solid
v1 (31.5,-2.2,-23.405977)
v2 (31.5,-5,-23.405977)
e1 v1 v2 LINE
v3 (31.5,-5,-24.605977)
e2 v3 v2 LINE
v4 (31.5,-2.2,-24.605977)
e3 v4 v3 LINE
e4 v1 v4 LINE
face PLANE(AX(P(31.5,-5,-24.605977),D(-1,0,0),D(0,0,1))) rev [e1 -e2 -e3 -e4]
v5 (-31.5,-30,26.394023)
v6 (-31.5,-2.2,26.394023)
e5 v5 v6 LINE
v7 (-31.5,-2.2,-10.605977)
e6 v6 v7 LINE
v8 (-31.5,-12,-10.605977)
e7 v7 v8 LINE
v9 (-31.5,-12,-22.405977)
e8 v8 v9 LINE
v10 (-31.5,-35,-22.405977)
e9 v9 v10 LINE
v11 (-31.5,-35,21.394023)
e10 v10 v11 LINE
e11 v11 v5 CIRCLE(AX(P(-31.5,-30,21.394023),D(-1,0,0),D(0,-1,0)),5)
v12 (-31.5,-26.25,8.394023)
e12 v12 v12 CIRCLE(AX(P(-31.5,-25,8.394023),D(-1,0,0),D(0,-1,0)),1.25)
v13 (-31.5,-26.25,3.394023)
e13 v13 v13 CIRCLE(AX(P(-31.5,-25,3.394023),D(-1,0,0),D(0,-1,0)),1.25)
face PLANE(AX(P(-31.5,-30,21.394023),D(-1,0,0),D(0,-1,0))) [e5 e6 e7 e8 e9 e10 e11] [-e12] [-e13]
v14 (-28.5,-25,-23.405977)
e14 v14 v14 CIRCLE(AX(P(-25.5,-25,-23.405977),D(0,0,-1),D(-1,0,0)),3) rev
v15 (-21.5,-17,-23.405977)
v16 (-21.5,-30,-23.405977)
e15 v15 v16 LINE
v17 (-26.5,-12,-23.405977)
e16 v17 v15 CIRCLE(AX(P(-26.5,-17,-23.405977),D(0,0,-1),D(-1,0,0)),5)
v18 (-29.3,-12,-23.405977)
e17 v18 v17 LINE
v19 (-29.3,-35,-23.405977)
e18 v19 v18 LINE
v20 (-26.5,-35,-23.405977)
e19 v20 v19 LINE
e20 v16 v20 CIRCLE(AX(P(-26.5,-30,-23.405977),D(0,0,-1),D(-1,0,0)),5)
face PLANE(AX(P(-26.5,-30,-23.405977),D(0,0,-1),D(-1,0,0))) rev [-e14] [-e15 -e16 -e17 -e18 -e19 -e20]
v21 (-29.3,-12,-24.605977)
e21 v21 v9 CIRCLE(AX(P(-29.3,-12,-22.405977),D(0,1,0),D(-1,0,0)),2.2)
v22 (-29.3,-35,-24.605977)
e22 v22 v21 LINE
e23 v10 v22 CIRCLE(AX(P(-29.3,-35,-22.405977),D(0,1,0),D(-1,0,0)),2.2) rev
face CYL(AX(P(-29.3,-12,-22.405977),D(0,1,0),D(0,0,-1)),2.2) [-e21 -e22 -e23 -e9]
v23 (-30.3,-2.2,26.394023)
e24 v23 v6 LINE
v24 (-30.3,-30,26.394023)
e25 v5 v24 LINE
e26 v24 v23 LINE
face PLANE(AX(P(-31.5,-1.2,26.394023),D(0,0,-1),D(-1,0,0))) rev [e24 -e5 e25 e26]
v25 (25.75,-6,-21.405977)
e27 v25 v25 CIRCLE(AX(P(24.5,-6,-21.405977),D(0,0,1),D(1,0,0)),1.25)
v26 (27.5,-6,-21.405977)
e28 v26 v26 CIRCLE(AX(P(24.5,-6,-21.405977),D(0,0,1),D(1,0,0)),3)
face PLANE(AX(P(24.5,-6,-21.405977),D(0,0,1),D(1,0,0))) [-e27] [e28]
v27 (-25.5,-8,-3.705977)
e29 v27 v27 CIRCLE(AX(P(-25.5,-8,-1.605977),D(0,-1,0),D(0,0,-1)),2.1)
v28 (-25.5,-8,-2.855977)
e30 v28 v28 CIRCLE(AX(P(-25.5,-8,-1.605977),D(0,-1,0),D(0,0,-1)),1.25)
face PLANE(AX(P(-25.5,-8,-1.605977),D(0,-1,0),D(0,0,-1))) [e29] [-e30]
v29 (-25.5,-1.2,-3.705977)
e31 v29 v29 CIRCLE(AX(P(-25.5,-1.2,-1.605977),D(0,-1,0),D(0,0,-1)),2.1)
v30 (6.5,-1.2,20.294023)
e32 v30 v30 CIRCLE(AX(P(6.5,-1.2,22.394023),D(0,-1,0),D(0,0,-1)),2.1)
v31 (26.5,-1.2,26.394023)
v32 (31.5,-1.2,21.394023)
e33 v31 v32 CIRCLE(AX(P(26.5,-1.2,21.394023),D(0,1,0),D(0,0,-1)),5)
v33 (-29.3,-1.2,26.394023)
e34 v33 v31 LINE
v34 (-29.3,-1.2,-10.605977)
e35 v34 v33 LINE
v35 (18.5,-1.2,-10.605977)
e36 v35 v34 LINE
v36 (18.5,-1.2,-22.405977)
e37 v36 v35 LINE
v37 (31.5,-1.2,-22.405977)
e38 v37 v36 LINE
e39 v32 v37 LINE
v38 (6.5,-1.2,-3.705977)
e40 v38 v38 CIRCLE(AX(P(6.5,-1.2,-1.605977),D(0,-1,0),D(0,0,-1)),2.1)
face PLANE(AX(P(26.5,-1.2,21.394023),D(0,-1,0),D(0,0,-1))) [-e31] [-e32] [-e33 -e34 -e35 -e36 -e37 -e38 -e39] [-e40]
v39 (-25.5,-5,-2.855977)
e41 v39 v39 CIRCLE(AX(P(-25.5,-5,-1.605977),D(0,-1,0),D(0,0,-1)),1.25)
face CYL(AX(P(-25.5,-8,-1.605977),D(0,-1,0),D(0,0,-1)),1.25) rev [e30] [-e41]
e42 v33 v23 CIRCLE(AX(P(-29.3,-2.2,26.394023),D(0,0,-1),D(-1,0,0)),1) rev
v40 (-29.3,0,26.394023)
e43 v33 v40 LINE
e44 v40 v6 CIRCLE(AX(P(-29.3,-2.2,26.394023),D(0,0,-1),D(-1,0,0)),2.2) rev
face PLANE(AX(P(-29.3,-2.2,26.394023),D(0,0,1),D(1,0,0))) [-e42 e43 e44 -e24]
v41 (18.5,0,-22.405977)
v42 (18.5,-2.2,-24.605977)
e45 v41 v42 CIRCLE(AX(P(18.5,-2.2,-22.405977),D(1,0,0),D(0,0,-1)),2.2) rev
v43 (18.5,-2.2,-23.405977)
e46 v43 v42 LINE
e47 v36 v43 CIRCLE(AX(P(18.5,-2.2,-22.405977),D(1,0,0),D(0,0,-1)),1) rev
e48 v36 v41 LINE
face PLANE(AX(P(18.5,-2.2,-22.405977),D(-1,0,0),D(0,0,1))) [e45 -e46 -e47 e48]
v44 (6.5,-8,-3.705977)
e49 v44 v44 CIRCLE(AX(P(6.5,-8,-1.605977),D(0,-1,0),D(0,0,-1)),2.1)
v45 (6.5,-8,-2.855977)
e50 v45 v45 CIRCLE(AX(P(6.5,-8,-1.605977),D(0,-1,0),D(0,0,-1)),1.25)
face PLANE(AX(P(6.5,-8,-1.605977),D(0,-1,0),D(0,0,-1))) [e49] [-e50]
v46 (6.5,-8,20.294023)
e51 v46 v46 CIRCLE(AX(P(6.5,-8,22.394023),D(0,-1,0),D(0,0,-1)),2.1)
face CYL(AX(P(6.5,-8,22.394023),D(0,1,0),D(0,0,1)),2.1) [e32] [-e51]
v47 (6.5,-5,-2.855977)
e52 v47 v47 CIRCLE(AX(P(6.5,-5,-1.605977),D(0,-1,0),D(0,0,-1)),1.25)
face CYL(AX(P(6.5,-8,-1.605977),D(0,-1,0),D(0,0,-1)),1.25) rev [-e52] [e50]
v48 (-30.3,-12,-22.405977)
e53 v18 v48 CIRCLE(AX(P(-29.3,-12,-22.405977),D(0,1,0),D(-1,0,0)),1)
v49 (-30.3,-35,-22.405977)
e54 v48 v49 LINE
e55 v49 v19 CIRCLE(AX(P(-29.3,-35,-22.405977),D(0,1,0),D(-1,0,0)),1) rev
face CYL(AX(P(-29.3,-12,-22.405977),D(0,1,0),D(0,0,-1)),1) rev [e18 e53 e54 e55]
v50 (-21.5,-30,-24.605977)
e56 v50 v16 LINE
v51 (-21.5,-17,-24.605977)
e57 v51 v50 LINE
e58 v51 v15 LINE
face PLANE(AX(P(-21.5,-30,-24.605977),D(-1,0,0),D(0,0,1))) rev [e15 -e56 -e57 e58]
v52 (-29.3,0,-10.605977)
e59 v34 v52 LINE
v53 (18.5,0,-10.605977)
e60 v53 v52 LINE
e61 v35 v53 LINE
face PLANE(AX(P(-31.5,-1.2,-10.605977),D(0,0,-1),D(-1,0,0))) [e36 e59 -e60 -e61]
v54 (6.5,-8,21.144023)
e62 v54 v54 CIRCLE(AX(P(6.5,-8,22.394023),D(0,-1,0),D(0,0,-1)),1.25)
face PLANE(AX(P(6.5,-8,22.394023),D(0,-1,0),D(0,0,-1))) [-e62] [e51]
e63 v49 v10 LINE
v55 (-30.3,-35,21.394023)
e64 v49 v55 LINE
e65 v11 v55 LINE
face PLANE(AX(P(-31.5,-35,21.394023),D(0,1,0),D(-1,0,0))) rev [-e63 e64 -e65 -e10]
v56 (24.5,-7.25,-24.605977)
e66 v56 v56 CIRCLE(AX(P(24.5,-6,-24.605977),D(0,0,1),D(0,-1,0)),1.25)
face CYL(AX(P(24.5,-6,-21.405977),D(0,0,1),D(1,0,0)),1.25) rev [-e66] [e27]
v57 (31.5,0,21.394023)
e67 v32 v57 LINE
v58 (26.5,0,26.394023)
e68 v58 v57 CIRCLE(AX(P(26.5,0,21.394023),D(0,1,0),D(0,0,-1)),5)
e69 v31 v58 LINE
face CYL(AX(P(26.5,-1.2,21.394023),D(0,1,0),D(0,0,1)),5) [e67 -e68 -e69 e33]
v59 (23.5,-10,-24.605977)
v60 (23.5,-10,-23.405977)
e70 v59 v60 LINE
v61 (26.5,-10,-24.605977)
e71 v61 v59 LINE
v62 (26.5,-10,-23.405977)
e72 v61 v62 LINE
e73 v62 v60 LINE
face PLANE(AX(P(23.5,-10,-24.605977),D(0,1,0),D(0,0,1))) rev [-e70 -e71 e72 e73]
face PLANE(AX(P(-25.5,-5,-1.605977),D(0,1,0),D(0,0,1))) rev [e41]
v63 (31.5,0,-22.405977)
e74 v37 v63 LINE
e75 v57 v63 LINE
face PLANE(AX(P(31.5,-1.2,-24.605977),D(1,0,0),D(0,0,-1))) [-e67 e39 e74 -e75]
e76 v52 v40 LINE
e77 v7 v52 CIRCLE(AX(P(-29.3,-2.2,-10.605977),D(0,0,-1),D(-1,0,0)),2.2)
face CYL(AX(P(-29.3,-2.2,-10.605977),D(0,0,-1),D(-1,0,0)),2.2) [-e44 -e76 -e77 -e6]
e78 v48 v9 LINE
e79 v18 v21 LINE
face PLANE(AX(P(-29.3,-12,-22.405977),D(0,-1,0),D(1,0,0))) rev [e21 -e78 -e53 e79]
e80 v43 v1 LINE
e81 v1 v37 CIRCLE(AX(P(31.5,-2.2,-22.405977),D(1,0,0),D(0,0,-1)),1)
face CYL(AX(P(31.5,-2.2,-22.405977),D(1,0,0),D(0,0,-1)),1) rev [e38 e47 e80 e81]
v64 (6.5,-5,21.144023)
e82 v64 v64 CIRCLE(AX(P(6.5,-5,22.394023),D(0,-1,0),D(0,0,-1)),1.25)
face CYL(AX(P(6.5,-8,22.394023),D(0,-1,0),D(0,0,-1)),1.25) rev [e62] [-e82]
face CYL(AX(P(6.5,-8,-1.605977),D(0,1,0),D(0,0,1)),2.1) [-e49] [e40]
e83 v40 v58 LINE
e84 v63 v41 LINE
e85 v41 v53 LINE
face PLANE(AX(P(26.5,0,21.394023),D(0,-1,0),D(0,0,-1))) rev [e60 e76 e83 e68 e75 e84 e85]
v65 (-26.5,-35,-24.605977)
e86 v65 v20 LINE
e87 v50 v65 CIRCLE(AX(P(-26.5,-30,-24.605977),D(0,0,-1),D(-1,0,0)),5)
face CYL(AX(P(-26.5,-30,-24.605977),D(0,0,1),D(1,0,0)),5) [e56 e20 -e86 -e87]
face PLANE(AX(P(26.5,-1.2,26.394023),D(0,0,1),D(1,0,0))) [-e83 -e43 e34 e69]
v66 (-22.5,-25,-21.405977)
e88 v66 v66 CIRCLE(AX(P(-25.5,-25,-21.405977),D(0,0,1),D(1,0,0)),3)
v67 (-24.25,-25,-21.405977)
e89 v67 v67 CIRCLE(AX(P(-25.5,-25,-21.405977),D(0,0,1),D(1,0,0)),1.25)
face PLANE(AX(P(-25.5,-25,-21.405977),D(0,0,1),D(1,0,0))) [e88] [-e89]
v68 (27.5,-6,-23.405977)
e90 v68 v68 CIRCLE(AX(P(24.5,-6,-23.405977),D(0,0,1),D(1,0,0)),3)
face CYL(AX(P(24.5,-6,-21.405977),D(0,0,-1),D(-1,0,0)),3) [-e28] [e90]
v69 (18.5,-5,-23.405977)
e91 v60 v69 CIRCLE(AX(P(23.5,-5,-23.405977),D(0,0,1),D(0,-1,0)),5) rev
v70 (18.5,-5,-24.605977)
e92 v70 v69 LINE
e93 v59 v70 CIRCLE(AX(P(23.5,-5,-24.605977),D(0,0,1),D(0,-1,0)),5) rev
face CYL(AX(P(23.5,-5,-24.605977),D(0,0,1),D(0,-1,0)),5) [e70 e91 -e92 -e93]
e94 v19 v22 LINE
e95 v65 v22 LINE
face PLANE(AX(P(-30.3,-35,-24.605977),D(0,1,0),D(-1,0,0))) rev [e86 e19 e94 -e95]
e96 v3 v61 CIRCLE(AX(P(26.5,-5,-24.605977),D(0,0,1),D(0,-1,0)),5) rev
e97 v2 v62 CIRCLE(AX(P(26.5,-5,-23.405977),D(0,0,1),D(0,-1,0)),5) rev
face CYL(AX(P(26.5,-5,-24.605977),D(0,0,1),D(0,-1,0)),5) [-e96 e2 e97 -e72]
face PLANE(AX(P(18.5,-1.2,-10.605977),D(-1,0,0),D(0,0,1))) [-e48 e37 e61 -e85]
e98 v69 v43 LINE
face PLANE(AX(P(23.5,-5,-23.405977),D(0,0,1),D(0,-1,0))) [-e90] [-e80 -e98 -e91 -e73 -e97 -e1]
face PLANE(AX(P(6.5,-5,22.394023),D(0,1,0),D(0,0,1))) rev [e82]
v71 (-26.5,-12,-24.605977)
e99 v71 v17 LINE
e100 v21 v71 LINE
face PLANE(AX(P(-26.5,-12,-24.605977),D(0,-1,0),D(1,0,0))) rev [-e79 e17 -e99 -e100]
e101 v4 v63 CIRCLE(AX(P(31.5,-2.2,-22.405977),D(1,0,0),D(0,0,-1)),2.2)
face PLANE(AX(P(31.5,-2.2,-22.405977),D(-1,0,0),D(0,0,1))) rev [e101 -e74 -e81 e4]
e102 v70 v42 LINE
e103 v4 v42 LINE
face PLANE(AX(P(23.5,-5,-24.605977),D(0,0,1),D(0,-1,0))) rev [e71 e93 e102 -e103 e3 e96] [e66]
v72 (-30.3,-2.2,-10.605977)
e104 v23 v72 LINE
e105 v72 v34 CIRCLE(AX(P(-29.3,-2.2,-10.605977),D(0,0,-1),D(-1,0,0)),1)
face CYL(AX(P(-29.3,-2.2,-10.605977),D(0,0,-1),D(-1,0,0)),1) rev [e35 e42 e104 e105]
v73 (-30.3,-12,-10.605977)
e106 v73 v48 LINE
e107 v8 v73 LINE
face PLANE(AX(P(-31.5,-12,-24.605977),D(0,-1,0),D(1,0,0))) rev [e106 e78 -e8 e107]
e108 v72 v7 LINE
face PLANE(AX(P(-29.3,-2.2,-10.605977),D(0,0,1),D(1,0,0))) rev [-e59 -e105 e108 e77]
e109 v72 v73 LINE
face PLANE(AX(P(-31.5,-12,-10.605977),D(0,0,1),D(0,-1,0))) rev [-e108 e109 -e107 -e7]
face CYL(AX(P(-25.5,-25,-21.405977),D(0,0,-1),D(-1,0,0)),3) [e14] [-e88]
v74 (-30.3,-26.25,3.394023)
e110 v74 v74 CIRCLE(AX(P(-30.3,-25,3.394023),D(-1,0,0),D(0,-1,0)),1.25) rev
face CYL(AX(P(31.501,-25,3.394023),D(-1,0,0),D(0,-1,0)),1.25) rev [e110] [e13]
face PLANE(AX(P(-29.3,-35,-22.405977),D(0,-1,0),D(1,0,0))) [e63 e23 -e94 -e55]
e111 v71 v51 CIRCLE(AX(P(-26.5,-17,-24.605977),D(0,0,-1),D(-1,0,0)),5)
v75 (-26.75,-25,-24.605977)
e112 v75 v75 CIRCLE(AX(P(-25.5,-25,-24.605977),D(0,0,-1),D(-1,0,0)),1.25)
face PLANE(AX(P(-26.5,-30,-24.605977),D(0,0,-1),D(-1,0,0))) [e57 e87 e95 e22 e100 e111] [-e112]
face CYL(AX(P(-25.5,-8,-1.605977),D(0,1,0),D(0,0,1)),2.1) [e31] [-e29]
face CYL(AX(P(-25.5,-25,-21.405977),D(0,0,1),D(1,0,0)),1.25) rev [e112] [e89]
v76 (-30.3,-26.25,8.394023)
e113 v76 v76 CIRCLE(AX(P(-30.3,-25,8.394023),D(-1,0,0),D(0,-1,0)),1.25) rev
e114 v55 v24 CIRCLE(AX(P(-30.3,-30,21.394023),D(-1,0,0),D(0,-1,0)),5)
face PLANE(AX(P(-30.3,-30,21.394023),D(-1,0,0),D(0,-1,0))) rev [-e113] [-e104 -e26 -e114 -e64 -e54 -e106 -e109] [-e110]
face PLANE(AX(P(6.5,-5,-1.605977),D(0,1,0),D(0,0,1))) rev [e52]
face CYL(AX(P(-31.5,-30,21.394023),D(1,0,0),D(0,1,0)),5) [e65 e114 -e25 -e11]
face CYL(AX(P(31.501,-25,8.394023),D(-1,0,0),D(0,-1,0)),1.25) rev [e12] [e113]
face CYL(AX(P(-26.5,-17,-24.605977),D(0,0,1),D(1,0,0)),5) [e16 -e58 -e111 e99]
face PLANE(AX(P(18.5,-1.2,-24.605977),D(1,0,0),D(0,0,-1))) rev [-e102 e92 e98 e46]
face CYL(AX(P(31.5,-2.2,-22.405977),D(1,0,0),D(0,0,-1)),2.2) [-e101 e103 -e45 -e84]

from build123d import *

# Parameters (mm, degrees)
SM_BASE_FLANGE_1_DEPTH           = 1.2
SKETCH_9_R                       = 2.1
EXTRUDE_1_DEPTH                  = 6.8
HOLE_WIZARD_M3_1_D               = 2.5
HOLE_WIZARD_M3_1_DEPTH           = 3
SM_EDGE_FLANGE_1_STRIP_W         = 6.8
SM_EDGE_FLANGE_1_STRIP_H         = 1.2
SM_EDGE_FLANGE_1_STRIP_CUT_DEPTH = 13
SM_EDGE_FLANGE_1_DEPTH           = 13
SM_EDGE_FLANGE_1_FLAT_DEPTH      = 1.2
SKETCH_15_R                      = 3
EXTRUDE_2_DEPTH                  = 2
HOLE_WIZARD_M3_2_D               = 2.5
SM_EDGE_FLANGE_4_STRIP_W         = 6.8
SM_EDGE_FLANGE_4_STRIP_H         = 1.2
SM_EDGE_FLANGE_4_STRIP_CUT_DEPTH = 37
SM_EDGE_FLANGE_4_DEPTH           = 37
SM_EDGE_FLANGE_4_FLAT_DEPTH      = 1.2
SM_EDGE_FLANGE_5_STRIP_W         = 6.8
SM_EDGE_FLANGE_5_STRIP_H         = 1.2
SM_EDGE_FLANGE_5_STRIP_CUT_DEPTH = 23
SM_EDGE_FLANGE_5_DEPTH           = 23
SM_EDGE_FLANGE_5_FLAT_DEPTH      = 1.2
SKETCH_26_R                      = 3
EXTRUDE_3_DEPTH                  = 2
HOLE_WIZARD_M3_3_D               = 2.5
CUT_EXTRUDE_1_REACH              = 78.751
SKETCH_29_R                      = 1.25


# Sheet-metal steps are written as plain solids
with BuildPart() as part:
    # Sketch 1 → 基体-法兰1 (new body)
    with BuildSketch(Plane(origin=(0, 0, 0), x_dir=(1, 0, 0), z_dir=(0, 1, 0))):
        with BuildLine():
            Line((18.5, 24.605976874), (31.5, 24.605976874))
            Line((31.5, 24.605976874), (31.5, -21.394023126))
            ThreePointArc((31.5, -21.394023126), (30.035533906, -24.929557032), (26.5, -26.394023126))
            Line((26.5, -26.394023126), (-31.5, -26.394023126))
            Line((-31.5, -26.394023126), (-31.5, 10.605976874))
            Line((-31.5, 10.605976874), (18.5, 10.605976874))
            Line((18.5, 10.605976874), (18.5, 24.605976874))
        make_face()
    extrude(amount=-SM_BASE_FLANGE_1_DEPTH)

    # 草图9 → 凸台-拉伸1 (add)
    with BuildSketch(Plane.XZ.offset(1.2)):
        with Locations(Location((-25.5, -1.605976874, 0), (0, 0, 270))):
            Circle(SKETCH_9_R)
        with Locations(Location((6.5, 22.394023126, 0), (0, 0, 270))):
            Circle(SKETCH_9_R)
        with Locations(Location((6.5, -1.605976874, 0), (0, 0, 270))):
            Circle(SKETCH_9_R)
    extrude(amount=EXTRUDE_1_DEPTH)

    # M3 螺纹孔1
    with Locations(Plane(origin=(0, -8, 0), x_dir=(-1, 0, 0), z_dir=(0, -1, 0))):
        with Locations((-6.5, 1.605976874), (25.5, 1.605976874), (-6.5, -22.394023126)):
            Hole(HOLE_WIZARD_M3_1_D / 2, depth=HOLE_WIZARD_M3_1_DEPTH)

    # 边线-法兰1 strip (across the edge) → 边线-法兰1 strip cut (cut)
    with BuildSketch(Plane(origin=(18.5, -1.2, -24.605976874), x_dir=(0, 0, 1), z_dir=(1, 0, 0))):
        with Locations((-1.2, -0.6)):
            Rectangle(SM_EDGE_FLANGE_1_STRIP_W, SM_EDGE_FLANGE_1_STRIP_H)
    extrude(amount=SM_EDGE_FLANGE_1_STRIP_CUT_DEPTH, mode=Mode.SUBTRACT)

    # 边线-法兰1 bend section (across the edge) → 边线-法兰1 (add)
    with BuildSketch(Plane(origin=(18.5, -1.2, -24.605976874), x_dir=(0, 0, 1), z_dir=(1, 0, 0))):
        with BuildLine():
            Line((0, 1), (1.2, 1))
            ThreePointArc((1.2, 1), (1.492893219, 0.292893219), (2.2, 0))
            Line((2.2, 0), (2.2, -1.2))
            ThreePointArc((2.2, -1.2), (0.644365081, -0.555634919), (0, 1))
        make_face()
    extrude(amount=SM_EDGE_FLANGE_1_DEPTH)

    # 边线-法兰1 profile (on flange) → 边线-法兰1 flat (add)
    with BuildSketch(Plane(origin=(0, -1.2, -24.605976874), x_dir=(1, 0, 0), z_dir=(0, 0, -1))):
        with BuildLine():
            Line((31.5, 1), (31.5, 3.8))
            ThreePointArc((31.5, 3.8), (30.035533906, 7.335533906), (26.5, 8.8))
            Line((26.5, 8.8), (23.5, 8.8))
            ThreePointArc((23.5, 8.8), (19.964466094, 7.335533906), (18.5, 3.8))
            Line((18.5, 3.8), (18.5, 1))
            Line((18.5, 1), (31.5, 1))
        make_face()
    extrude(amount=-SM_EDGE_FLANGE_1_FLAT_DEPTH)

    # 草图15 → 凸台-拉伸2 (add)
    with BuildSketch(Plane.XY.offset(-23.405976874)):
        with Locations((24.5, -6)):
            Circle(SKETCH_15_R)
    extrude(amount=EXTRUDE_2_DEPTH)

    # M3 螺纹孔2 (through all)
    with Locations(Plane.XY.offset(-21.405976874)):
        with Locations((24.5, -6)):
            Hole(HOLE_WIZARD_M3_2_D / 2)

    # 边线-法兰4 strip (across the edge) → 边线-法兰4 strip cut (cut)
    with BuildSketch(Plane(origin=(-31.5, -1.2, 26.394023126), x_dir=(1, 0, 0), z_dir=(0, 0, -1))):
        with Locations((-1.2, -0.6)):
            Rectangle(SM_EDGE_FLANGE_4_STRIP_W, SM_EDGE_FLANGE_4_STRIP_H)
    extrude(amount=SM_EDGE_FLANGE_4_STRIP_CUT_DEPTH, mode=Mode.SUBTRACT)

    # 边线-法兰4 bend section (across the edge) → 边线-法兰4 (add)
    with BuildSketch(Plane(origin=(-31.5, -1.2, 26.394023126), x_dir=(1, 0, 0), z_dir=(0, 0, -1))):
        with BuildLine():
            Line((0, 1), (1.2, 1))
            ThreePointArc((1.2, 1), (1.492893219, 0.292893219), (2.2, 0))
            Line((2.2, 0), (2.2, -1.2))
            ThreePointArc((2.2, -1.2), (0.644365081, -0.555634919), (0, 1))
        make_face()
    extrude(amount=SM_EDGE_FLANGE_4_DEPTH)

    # 边线-法兰4 profile (on flange) → 边线-法兰4 flat (add)
    with BuildSketch(Plane(origin=(-31.5, -1.2, 0), x_dir=(0, 0, -1), z_dir=(-1, 0, 0))):
        with BuildLine():
            Line((-26.394023126, 1), (10.605976874, 1))
            Line((10.605976874, 1), (10.605976874, 10.8))
            Line((10.605976874, 10.8), (24.605976874, 10.8))
            Line((24.605976874, 10.8), (24.605976874, 33.8))
            Line((24.605976874, 33.8), (-21.394023126, 33.8))
            ThreePointArc((-21.394023126, 33.8), (-24.929557032, 32.335533906), (-26.394023126, 28.8))
            Line((-26.394023126, 28.8), (-26.394023126, 1))
        make_face()
    extrude(amount=-SM_EDGE_FLANGE_4_FLAT_DEPTH)

    # 边线-法兰5 strip (across the edge) → 边线-法兰5 strip cut (cut)
    with BuildSketch(Plane(origin=(-30.3, -35, -24.605976874), x_dir=(0, 0, 1), z_dir=(0, 1, 0))):
        with Locations((-1.2, -0.6)):
            Rectangle(SM_EDGE_FLANGE_5_STRIP_W, SM_EDGE_FLANGE_5_STRIP_H)
    extrude(amount=SM_EDGE_FLANGE_5_STRIP_CUT_DEPTH, mode=Mode.SUBTRACT)

    # 边线-法兰5 bend section (across the edge) → 边线-法兰5 (add)
    with BuildSketch(Plane(origin=(-30.3, -35, -24.605976874), x_dir=(0, 0, 1), z_dir=(0, 1, 0))):
        with BuildLine():
            Line((0, 1), (1.2, 1))
            ThreePointArc((1.2, 1), (1.492893219, 0.292893219), (2.2, 0))
            Line((2.2, 0), (2.2, -1.2))
            ThreePointArc((2.2, -1.2), (0.644365081, -0.555634919), (0, 1))
        make_face()
    extrude(amount=SM_EDGE_FLANGE_5_DEPTH)

    # 边线-法兰5 profile (on flange) → 边线-法兰5 flat (add)
    with BuildSketch(Plane(origin=(-30.3, 0, -24.605976874), x_dir=(0, 1, 0), z_dir=(0, 0, -1))):
        with BuildLine():
            ThreePointArc((-12, 3.8), (-13.464466094, 7.335533906), (-17, 8.8))
            Line((-17, 8.8), (-30, 8.8))
            ThreePointArc((-30, 8.8), (-33.535533906, 7.335533906), (-35, 3.8))
            Line((-35, 3.8), (-35, 1))
            Line((-35, 1), (-12, 1))
            Line((-12, 1), (-12, 3.8))
        make_face()
    extrude(amount=-SM_EDGE_FLANGE_5_FLAT_DEPTH)

    # 草图26 → 凸台-拉伸3 (add)
    with BuildSketch(Plane.XY.offset(-23.405976874)):
        with Locations(Location((-25.5, -25, 0), (0, 0, 180))):
            Circle(SKETCH_26_R)
    extrude(amount=EXTRUDE_3_DEPTH)

    # M3 螺纹孔3 (through all)
    with Locations(Plane.XY.offset(-21.405976874)):
        with Locations((-25.5, -25)):
            Hole(HOLE_WIZARD_M3_3_D / 2)

    # 草图29 → 切除-拉伸1 (cut, up to next)
    with BuildSketch(Plane.ZY.offset(31.5), mode=Mode.PRIVATE) as cut_extrude_1_sk1:
        with Locations(Location((3.394023126, -25, 0), (0, 0, 270))):
            Circle(SKETCH_29_R)
    cut_extrude_1_tool1 = extrude(cut_extrude_1_sk1.sketch, amount=-CUT_EXTRUDE_1_REACH, mode=Mode.PRIVATE) & part.part
    # 草图29 → 切除-拉伸1 (cut, up to next)
    with BuildSketch(Plane.ZY.offset(31.5), mode=Mode.PRIVATE) as cut_extrude_1_sk2:
        with Locations(Location((8.394023126, -25, 0), (0, 0, 270))):
            Circle(SKETCH_29_R)
    cut_extrude_1_tool2 = extrude(cut_extrude_1_sk2.sketch, amount=-CUT_EXTRUDE_1_REACH, mode=Mode.PRIVATE) & part.part
    add(cut_extrude_1_tool1.solids().sort_by_distance((-31.5, -25, 3.394023))[0], mode=Mode.SUBTRACT)
    add(cut_extrude_1_tool2.solids().sort_by_distance((-31.5, -25, 8.394023))[0], mode=Mode.SUBTRACT)


solid = part.part
